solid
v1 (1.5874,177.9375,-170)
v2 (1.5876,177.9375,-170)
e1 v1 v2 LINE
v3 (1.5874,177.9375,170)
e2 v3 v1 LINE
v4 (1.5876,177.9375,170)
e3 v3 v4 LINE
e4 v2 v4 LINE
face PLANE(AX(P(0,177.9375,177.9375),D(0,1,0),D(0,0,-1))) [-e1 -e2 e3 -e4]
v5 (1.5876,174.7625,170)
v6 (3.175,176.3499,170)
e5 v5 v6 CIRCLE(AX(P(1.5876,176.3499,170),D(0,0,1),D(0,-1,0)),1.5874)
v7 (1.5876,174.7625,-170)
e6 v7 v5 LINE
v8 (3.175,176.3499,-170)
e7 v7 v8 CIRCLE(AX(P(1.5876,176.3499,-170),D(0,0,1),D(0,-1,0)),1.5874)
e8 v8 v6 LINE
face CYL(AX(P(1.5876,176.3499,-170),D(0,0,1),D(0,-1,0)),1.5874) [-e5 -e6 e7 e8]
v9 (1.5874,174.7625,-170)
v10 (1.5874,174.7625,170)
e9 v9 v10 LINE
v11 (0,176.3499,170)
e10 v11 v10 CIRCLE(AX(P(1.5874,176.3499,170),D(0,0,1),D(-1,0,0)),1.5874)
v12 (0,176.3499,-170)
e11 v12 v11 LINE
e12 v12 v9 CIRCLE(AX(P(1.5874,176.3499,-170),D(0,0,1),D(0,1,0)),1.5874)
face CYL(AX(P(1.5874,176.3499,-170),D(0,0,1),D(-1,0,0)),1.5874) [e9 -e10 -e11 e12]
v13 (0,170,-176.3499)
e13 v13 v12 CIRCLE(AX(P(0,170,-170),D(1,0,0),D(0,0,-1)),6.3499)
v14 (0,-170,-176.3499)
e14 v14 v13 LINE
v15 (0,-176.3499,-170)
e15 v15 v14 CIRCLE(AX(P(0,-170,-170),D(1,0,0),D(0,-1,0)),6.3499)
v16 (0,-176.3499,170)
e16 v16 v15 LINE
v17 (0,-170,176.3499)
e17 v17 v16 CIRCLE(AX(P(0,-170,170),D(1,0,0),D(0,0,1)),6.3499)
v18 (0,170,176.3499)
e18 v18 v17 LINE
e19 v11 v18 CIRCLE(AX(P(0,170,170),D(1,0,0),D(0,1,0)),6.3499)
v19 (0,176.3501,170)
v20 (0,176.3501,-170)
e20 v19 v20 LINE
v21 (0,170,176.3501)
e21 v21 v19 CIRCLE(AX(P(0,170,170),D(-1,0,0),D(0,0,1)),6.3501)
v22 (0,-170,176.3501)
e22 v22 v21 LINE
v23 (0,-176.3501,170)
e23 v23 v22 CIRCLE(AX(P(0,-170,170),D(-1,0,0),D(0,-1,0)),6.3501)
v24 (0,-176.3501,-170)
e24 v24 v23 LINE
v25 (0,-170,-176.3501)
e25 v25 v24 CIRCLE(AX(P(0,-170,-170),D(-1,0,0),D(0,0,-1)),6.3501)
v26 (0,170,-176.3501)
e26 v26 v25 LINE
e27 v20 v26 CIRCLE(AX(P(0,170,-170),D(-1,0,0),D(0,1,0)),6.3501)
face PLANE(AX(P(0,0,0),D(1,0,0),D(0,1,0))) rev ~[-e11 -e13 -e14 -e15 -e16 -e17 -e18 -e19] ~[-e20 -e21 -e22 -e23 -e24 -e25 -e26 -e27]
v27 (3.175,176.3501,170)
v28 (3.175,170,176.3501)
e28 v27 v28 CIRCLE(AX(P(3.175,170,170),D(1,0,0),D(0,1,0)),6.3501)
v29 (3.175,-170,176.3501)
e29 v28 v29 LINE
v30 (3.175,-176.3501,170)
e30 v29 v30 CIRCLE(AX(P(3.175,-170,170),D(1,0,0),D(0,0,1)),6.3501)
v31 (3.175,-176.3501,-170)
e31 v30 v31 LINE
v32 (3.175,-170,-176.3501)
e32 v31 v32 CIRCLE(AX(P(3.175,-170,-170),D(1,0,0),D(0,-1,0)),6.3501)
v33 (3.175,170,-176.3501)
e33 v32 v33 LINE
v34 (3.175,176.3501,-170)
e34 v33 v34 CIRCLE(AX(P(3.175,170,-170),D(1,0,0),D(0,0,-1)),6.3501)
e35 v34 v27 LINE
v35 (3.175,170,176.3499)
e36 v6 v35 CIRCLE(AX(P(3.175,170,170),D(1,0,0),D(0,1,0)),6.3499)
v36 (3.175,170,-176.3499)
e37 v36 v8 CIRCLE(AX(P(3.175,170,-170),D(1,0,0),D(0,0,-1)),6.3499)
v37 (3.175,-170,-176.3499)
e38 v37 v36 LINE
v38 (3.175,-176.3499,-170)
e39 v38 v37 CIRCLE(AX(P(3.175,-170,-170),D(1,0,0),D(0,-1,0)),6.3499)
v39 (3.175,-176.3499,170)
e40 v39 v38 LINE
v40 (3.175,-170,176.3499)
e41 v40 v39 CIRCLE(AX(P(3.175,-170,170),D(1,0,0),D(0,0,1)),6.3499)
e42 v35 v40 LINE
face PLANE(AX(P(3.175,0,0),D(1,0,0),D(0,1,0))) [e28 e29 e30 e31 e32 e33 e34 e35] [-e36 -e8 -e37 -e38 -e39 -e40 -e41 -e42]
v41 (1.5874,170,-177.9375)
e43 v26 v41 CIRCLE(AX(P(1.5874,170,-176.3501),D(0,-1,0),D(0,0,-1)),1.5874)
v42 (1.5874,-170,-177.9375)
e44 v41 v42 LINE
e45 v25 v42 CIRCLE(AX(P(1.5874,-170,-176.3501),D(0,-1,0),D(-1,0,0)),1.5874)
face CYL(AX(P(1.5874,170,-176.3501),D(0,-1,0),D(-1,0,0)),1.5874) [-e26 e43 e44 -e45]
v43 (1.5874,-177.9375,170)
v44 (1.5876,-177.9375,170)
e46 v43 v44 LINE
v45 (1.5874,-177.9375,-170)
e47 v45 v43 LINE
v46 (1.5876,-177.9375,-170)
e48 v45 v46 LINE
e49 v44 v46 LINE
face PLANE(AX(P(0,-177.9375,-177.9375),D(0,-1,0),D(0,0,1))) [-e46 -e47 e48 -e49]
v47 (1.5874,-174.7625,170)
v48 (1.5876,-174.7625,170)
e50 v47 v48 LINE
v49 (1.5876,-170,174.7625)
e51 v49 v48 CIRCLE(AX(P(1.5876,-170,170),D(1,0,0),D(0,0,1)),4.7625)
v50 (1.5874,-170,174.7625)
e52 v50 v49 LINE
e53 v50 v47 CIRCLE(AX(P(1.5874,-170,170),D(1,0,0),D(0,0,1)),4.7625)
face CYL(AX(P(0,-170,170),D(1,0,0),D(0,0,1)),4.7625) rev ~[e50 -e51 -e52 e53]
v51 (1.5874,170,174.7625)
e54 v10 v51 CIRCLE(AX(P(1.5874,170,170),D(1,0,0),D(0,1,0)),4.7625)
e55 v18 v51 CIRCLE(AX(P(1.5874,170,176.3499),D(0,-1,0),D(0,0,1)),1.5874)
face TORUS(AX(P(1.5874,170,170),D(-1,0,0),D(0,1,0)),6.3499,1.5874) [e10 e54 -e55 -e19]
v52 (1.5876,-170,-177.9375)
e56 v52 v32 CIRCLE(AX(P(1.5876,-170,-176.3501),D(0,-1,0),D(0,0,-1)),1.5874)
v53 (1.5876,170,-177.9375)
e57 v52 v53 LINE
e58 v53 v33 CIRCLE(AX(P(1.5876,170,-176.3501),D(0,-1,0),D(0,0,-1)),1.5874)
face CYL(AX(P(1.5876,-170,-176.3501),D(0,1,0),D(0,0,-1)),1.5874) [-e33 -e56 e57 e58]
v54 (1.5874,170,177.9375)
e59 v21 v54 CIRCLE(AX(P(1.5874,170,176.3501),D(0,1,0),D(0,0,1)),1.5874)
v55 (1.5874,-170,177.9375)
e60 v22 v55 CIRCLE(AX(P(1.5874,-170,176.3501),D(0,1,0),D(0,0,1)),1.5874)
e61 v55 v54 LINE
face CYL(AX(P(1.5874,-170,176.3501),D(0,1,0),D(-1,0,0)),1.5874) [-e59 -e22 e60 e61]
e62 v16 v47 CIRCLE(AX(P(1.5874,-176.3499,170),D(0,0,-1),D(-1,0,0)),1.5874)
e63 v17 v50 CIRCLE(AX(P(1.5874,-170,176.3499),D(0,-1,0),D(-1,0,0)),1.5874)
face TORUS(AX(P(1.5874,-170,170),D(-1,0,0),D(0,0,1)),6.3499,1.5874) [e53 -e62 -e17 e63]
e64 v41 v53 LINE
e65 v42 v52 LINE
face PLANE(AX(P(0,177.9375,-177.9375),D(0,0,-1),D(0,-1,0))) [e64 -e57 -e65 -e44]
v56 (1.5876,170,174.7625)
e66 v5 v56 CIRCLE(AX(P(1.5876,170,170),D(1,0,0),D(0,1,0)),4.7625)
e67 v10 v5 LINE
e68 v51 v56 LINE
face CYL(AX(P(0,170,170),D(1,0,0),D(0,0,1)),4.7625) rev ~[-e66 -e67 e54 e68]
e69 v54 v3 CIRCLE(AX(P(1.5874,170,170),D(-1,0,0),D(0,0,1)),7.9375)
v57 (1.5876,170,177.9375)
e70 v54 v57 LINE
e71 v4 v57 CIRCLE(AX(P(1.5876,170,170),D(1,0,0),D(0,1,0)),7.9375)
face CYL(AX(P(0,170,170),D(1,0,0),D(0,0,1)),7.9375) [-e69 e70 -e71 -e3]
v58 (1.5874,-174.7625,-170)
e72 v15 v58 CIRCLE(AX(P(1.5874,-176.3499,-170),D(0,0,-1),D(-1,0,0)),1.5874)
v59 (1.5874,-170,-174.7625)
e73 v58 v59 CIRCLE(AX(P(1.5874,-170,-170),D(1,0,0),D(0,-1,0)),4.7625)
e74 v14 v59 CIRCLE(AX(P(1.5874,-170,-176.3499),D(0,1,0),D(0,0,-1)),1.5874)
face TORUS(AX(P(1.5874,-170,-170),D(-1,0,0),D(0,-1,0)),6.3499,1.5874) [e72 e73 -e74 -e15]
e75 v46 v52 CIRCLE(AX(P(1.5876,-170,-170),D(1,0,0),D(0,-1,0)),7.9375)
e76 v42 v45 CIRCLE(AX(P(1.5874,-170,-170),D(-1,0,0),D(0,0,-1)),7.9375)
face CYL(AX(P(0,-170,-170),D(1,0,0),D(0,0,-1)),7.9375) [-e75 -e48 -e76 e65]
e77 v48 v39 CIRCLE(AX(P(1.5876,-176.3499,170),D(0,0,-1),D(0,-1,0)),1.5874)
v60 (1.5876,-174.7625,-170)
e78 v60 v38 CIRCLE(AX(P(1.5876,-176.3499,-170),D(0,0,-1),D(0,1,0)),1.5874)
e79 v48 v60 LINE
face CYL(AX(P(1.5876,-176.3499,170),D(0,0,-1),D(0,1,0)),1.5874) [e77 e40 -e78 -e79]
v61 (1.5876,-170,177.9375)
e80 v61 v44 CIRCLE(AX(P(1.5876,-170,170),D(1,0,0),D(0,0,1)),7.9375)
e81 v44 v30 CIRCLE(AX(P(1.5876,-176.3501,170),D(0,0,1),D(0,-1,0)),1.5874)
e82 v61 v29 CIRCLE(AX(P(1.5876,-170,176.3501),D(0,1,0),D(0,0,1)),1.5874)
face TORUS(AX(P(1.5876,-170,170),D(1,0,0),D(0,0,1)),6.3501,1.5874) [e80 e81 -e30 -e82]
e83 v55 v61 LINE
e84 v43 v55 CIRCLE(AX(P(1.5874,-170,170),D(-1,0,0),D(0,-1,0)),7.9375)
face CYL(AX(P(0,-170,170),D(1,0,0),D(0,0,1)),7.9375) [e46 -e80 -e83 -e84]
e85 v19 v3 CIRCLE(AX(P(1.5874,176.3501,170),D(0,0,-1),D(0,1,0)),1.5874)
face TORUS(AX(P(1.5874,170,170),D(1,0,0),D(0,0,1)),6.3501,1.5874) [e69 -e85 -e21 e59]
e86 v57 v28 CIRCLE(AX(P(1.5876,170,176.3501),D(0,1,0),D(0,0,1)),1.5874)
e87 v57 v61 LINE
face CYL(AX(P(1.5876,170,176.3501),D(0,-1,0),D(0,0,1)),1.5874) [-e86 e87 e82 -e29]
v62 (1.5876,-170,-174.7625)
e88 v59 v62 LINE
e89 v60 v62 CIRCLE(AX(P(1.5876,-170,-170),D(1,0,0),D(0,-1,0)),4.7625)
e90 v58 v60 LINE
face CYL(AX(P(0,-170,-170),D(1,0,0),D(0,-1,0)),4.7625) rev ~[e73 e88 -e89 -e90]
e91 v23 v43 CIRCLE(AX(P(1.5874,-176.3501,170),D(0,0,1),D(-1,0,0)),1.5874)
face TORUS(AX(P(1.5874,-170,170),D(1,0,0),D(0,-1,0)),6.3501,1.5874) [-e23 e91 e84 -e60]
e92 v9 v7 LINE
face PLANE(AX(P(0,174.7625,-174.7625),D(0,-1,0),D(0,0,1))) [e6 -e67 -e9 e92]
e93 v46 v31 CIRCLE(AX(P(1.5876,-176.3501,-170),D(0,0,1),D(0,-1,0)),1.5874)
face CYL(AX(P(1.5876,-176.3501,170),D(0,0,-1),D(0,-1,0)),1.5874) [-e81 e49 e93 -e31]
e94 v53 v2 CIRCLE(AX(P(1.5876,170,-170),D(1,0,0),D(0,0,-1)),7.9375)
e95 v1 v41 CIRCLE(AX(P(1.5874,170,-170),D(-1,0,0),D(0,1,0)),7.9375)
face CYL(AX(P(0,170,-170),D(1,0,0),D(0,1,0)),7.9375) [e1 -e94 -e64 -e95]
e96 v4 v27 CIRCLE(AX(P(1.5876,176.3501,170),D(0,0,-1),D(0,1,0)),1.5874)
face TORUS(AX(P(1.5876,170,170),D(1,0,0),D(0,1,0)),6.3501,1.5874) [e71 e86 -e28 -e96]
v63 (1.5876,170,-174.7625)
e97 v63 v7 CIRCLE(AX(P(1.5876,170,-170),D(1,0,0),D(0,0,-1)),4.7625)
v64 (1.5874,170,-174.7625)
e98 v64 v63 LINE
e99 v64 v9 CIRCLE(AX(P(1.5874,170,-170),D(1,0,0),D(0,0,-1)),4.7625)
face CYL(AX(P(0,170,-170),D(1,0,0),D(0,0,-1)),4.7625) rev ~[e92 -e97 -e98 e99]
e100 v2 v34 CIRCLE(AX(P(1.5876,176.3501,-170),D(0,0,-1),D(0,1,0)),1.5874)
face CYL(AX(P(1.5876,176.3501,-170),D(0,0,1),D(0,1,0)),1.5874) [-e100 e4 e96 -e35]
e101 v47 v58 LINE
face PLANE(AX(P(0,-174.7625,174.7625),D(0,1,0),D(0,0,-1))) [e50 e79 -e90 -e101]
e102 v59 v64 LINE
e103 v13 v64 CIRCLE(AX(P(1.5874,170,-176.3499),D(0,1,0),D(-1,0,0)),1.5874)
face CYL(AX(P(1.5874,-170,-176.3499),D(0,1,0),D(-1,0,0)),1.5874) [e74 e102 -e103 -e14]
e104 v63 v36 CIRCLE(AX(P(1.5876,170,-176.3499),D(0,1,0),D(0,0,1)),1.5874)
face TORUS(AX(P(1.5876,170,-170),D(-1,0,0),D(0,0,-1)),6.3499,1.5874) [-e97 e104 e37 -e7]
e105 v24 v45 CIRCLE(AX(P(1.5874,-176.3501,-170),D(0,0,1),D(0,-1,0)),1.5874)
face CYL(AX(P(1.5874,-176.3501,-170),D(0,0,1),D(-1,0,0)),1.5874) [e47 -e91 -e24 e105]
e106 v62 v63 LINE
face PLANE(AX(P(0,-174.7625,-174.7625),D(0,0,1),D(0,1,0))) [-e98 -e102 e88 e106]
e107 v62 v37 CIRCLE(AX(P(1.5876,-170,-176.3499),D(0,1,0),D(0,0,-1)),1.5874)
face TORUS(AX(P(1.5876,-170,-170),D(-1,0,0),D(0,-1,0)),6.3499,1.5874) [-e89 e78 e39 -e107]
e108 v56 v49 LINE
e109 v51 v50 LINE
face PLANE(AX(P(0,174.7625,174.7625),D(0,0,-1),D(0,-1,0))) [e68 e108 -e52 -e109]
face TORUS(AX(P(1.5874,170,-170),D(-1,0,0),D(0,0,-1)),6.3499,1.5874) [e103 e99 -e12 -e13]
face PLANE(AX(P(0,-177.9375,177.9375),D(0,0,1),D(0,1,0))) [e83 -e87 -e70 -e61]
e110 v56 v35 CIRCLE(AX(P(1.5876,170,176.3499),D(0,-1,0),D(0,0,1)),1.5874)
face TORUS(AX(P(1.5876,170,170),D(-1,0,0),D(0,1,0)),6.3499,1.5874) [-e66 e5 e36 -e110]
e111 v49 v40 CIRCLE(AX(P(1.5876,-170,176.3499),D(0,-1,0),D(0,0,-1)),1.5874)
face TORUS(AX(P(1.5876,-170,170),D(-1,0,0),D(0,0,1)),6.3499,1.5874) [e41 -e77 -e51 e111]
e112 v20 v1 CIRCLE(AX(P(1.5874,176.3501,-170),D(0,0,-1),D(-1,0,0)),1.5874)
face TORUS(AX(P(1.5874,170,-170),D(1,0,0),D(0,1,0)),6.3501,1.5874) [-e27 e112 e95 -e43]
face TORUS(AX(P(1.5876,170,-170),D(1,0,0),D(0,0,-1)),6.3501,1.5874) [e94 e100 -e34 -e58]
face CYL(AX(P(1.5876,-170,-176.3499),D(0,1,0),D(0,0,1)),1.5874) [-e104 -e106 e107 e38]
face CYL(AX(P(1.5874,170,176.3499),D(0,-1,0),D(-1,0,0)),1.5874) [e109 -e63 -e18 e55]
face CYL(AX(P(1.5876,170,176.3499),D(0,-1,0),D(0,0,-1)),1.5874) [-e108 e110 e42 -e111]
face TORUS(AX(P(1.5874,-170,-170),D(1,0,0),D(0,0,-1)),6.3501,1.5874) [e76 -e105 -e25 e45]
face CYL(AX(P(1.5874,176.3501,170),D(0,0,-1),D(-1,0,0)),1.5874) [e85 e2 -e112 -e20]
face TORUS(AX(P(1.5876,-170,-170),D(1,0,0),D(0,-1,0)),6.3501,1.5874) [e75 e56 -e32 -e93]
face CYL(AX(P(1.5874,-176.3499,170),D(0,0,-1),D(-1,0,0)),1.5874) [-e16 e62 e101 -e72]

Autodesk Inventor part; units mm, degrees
ref_plane "YZ Plane" through (0, 0, 0) normal (1, 0, 0) x (0, 1, 0)
ref_plane "XZ Plane" through (0, 0, 0) normal (0, 1, 0) x (-1, 0, 0)
ref_plane "XY Plane" through (0, 0, 0) normal (0, 0, 1) x (1, 0, 0)
sketch "Sketch1" plane through (0, 0, 0) normal (1, 0, 0) x (0, 1, 0)
  line L0 (-150, -150) -> (150, -150) construction
  line L1 (150, -150) -> (150, 150) construction
  line L2 (150, 150) -> (-150, 150) construction
  line L3 (-150, 150) -> (-150, -150) construction
  line L4 (-150, -150) -> (150, 150) construction
  line L5 (150, -150) -> (-150, 150) construction
  line L6 (-170, 170) -> (170, 170) construction
  line L7 (170, 170) -> (170, -170) construction
  line L8 (170, -170) -> (-170, -170) construction
  line L9 (-170, -170) -> (-170, 170) construction
  line L10 (174.7625, 174.7625) -> (-174.7625, 174.7625)
  line L11 (-174.7625, 174.7625) -> (-174.7625, -174.7625)
  line L12 (-174.7625, -174.7625) -> (174.7625, -174.7625)
  line L13 (174.7625, -174.7625) -> (174.7625, 174.7625)
  line L14 (-177.9375, 177.9375) -> (177.9375, 177.9375)
  line L15 (177.9375, 177.9375) -> (177.9375, -177.9375)
  line L16 (177.9375, -177.9375) -> (-177.9375, -177.9375)
  line L17 (-177.9375, -177.9375) -> (-177.9375, 177.9375)
  point P0 (0, 0)
  dimension "d0" = 300
  dimension "d1" = 300
  dimension "d2" = 20
  dimension "d3" = 4.7625
  dimension "d4" = 3.175
extrude "Extrusion1" add sketch "Sketch1" along normal blind 3.175
fillet "Fillet1" radius 7.9375 4 edges at (1.5875, 177.9375, 177.9375) (1.5875, -177.9375, 177.9375) (1.5875, -177.9375, -177.9375) (1.5875, 177.9375, -177.9375)
fillet "Fillet3" radius 4.7625 4 edges at (1.5875, 174.7625, -174.7625) (1.5875, -174.7625, 174.7625) (1.5875, 174.7625, 174.7625) (1.5875, -174.7625, -174.7625)
fillet "Fillet2" radius 1.5875 24 edges at (3.175, -175.6127, 175.6127) (3.175, -177.9375, 0) (3.175, -175.6127, -175.6127) (3.175, 0, -177.9375) (3.175, 175.6127, -175.6127) (3.175, 177.9375, 0) (3.175, 175.6127, 175.6127) (3.175, 0, 177.9375) (0, 175.6127, 175.6127) (0, 177.9375, 0) (0, 175.6127, -175.6127) (0, 0, -177.9375) (0, -175.6127, -175.6127) (0, -177.9375, 0) (0, -175.6127, 175.6127) (0, 0, 177.9375) (3.175, 174.7625, 0) (3.175, 0, -174.7625) (3.175, -174.7625, 0) (3.175, 0, 174.7625) (0, -174.7625, 0) (0, 0, -174.7625) (0, 174.7625, 0) (0, 0, 174.7625)
equation "\"d0\" = width"
equation "\"d1\" = height"
equation "\"d3\" = 0.375 * facingThickness"
equation "\"d4\" = 0.25 * facingThickness"
equation "\"d5\" = 0.25 * facingThickness"
equation "\"d7\" = 0.625 * facingThickness"
equation "\"d9\" = 0.375 * facingThickness"
equation "\"d8\" = 0.125 * facingThickness"
equation "\"mppcMountThickness\" = 6.35"
equation "\"width\" = 300"
equation "\"height\" = 300"
equation "\"facingThickness\" = 12.7"
equation "\"facingGasketThickness\" = 1.5875"
properties part number "matingORing" material "Rubber"
